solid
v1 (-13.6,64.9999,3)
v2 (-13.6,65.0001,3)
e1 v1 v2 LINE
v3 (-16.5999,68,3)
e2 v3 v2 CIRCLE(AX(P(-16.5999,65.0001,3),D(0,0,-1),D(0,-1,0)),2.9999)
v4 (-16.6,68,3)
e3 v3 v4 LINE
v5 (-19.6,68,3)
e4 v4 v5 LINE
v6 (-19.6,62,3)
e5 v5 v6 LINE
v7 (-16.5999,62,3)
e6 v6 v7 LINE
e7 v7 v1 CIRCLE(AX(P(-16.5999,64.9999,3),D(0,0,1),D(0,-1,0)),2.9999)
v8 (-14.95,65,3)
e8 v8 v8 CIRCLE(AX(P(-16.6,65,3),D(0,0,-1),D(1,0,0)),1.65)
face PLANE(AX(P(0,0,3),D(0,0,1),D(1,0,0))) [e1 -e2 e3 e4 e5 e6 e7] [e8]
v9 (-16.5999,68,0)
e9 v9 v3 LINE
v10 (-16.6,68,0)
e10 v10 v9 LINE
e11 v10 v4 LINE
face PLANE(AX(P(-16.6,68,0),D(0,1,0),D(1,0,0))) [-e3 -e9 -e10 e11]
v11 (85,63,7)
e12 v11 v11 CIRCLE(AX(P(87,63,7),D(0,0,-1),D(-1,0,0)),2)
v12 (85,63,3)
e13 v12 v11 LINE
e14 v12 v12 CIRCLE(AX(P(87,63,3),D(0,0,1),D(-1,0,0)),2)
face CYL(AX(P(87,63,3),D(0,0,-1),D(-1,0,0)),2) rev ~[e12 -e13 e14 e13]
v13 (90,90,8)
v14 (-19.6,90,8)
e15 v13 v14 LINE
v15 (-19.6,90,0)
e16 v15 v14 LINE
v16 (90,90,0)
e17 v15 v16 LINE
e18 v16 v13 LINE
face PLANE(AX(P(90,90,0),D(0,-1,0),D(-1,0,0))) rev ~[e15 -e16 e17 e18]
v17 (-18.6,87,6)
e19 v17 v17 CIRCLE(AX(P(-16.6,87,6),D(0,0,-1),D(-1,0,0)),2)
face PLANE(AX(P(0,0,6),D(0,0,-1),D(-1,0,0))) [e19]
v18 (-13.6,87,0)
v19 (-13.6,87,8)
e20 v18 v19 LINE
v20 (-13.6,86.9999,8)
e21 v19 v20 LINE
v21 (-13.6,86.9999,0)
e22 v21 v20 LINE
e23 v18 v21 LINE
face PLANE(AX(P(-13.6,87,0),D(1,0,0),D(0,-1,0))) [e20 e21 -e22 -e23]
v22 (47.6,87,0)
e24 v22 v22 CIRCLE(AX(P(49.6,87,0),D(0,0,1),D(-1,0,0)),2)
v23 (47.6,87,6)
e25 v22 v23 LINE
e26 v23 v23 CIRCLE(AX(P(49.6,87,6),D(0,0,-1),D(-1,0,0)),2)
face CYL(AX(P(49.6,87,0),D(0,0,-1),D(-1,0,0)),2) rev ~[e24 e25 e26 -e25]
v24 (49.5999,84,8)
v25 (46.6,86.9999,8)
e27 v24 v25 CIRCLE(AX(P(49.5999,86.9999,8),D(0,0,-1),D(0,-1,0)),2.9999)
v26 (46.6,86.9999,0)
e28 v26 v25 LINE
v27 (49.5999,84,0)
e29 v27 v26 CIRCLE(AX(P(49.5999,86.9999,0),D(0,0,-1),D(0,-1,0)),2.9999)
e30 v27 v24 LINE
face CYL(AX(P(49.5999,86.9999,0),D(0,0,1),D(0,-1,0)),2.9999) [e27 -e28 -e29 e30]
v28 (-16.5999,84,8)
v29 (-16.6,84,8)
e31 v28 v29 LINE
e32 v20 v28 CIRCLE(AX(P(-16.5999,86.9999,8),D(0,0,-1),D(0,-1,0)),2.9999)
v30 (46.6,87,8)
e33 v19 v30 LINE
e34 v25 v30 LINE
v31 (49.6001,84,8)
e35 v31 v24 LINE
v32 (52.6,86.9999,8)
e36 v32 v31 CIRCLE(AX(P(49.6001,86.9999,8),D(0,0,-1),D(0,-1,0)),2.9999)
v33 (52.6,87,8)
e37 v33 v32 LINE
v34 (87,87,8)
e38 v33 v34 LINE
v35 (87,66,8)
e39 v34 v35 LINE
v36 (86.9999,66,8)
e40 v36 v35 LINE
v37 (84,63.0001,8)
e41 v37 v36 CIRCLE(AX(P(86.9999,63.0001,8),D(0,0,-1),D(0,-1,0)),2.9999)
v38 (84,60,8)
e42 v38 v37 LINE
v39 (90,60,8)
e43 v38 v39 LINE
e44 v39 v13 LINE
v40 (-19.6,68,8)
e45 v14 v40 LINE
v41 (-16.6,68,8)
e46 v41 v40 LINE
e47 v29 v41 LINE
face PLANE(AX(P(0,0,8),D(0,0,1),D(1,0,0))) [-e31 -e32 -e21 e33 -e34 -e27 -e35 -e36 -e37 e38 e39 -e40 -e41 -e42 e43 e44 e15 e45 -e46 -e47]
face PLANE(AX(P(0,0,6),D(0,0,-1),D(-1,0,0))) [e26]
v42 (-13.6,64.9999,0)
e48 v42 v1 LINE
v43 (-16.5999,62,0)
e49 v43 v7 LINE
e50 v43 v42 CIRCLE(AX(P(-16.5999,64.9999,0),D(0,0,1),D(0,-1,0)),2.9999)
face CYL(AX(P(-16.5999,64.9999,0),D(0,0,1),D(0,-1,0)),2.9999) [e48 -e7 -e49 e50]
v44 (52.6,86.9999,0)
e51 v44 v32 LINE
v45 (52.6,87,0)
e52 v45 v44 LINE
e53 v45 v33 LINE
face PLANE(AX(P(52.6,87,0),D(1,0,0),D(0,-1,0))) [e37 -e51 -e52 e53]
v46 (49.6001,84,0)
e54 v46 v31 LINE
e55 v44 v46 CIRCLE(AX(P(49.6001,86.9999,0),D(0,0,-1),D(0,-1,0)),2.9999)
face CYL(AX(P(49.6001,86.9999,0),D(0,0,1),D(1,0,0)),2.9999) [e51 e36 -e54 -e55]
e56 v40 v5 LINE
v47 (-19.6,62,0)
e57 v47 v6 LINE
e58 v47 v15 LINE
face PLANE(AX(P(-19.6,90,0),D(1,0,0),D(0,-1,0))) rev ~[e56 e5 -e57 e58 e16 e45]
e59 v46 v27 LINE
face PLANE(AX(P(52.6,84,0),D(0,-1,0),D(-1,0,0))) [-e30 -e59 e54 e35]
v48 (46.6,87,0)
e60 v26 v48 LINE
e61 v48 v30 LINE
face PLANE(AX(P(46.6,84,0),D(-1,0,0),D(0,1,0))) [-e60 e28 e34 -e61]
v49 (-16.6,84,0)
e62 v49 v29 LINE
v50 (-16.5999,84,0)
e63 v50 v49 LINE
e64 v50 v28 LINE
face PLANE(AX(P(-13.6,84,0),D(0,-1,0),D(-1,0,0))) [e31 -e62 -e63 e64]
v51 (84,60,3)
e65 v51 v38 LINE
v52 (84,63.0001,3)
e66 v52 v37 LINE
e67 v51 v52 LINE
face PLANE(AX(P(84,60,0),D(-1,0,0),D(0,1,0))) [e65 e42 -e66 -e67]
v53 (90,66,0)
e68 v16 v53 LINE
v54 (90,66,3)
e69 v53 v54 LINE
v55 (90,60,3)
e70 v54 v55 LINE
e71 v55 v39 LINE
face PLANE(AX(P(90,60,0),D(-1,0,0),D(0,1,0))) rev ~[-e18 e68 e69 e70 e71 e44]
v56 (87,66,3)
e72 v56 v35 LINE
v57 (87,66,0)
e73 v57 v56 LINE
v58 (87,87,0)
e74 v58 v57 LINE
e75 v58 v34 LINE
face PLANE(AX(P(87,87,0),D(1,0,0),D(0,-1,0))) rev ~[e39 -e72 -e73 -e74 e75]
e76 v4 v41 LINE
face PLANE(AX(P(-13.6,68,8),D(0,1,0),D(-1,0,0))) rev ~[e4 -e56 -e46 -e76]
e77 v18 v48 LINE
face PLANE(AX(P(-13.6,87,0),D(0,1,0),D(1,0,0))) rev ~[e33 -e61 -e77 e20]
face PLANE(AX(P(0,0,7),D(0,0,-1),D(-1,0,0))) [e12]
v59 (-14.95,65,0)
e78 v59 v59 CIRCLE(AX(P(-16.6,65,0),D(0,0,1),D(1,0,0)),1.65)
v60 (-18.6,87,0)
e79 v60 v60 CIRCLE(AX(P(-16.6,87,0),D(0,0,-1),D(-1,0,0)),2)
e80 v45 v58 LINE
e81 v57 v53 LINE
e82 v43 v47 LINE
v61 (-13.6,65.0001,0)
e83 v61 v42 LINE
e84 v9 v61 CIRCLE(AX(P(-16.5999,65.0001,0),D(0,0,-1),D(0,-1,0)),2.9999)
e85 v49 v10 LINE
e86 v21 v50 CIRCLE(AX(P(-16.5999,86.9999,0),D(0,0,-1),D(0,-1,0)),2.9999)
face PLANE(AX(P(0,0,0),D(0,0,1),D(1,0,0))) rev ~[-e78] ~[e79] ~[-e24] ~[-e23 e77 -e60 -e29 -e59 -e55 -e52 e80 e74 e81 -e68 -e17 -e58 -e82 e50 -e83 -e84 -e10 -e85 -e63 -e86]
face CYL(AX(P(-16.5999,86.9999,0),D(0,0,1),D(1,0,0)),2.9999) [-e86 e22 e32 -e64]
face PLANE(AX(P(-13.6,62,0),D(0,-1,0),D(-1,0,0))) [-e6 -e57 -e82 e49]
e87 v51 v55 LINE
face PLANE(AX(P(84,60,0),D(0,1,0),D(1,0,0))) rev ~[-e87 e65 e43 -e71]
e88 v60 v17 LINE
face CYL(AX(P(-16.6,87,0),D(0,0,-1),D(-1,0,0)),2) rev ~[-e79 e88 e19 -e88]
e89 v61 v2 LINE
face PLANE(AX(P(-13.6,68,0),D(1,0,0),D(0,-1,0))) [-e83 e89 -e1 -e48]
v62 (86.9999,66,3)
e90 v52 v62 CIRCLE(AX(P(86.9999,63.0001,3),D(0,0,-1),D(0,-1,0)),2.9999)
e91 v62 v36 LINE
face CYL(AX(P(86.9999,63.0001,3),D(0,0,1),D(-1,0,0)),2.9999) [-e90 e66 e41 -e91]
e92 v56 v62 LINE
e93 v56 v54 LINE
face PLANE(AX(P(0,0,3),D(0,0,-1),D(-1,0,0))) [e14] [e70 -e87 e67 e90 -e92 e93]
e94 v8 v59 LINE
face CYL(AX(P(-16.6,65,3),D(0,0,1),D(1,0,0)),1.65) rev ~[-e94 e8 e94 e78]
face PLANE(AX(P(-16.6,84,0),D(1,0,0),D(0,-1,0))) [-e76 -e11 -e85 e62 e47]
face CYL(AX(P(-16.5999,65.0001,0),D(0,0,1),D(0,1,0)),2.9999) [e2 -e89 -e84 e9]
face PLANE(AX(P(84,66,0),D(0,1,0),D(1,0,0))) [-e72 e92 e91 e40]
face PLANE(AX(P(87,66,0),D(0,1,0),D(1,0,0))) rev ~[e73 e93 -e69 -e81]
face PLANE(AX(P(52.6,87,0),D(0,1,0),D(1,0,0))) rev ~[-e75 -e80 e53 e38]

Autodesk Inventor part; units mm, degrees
ref_plane "YZ Plane" through (0, 0, 0) normal (1, 0, 0) x (0, 1, 0)
ref_plane "XZ Plane" through (0, 0, 0) normal (0, 1, 0) x (-1, 0, 0)
ref_plane "XY Plane" through (0, 0, 0) normal (0, 0, 1) x (1, 0, 0)
sketch "Sketch1" plane through (0, 0, 0) normal (0, 0, 1) x (1, 0, 0)
  point P0 (0, 0)
sketch "Sketch2" plane through (0, 0, 0) normal (0, 0, 1) x (1, 0, 0)
  line L0 (-58, -60) -> (-60, -60) projected
  line L1 (-60, -60) -> (-60, -39.5) projected
  line L2 (-60, -39.5) -> (-58, -39.5) projected
  line L3 (-58, -39.5) -> (-58, -60) projected
  line L4 (49.6, 30) -> (51.6, 30) projected
  line L5 (51.6, 30) -> (51.6, 9.5) projected
  line L6 (51.6, 9.5) -> (49.6, 9.5) projected
  line L7 (49.6, 9.5) -> (49.6, 30) projected
  line L8 (-58, 39.5) -> (-60, 39.5) projected
  line L9 (-60, 39.5) -> (-60, 60) projected
  line L10 (-60, 60) -> (-58, 60) projected
  line L11 (-58, 60) -> (-58, 39.5) projected
  line L12 (-21.6, -39.5) -> (-19.6, -39.5) projected
  line L13 (-19.6, -39.5) -> (-19.6, -60) projected
  line L14 (-19.6, -60) -> (-21.6, -60) projected
  line L15 (-21.6, -60) -> (-21.6, -39.5) projected
  line L16 (51.6, -30) -> (49.6, -30) projected
  line L17 (49.6, -30) -> (49.6, -9.5) projected
  line L18 (49.6, -9.5) -> (51.6, -9.5) projected
  line L19 (51.6, -9.5) -> (51.6, -30) projected
  line L20 (-21.6, 60) -> (-19.6, 60) projected
  line L21 (-19.6, 60) -> (-19.6, 39.5) projected
  line L22 (-19.6, 39.5) -> (-21.6, 39.5) projected
  line L23 (-21.6, 39.5) -> (-21.6, 60) projected
  line L24 (90, -35) -> (90, 35) projected
  line L25 (90, 35) -> (49.6, 35) projected
  line L26 (49.6, 35) -> (49.6, 60) projected
  line L27 (49.6, 60) -> (90, 60) projected
  line L28 (90, 60) -> (90, 90) projected
  line L29 (90, 90) -> (-19.6, 90) projected
  line L30 (-19.6, 90) -> (-19.6, 65) projected
  line L31 (-19.6, 65) -> (-60, 65) projected
  line L32 (-60, 65) -> (-60, 90) projected
  line L33 (-60, 90) -> (-90, 90) projected
  line L34 (-90, 90) -> (-90, -90) projected
  line L35 (-90, -90) -> (-60, -90) projected
  line L36 (-60, -90) -> (-60, -65) projected
  line L37 (-60, -65) -> (-19.6, -65) projected
  line L38 (-19.6, -65) -> (-19.6, -90) projected
  line L39 (-19.6, -90) -> (90, -90) projected
  line L40 (90, -90) -> (90, -60) projected
  line L41 (90, -60) -> (49.6, -60) projected
  line L42 (49.6, -60) -> (49.6, -35) projected
  line L43 (49.6, -35) -> (90, -35) projected
  line L44 (86, -32) -> (73.8, -32) projected
  line L45 (73.8, -32) -> (73.8, -7.5) projected
  line L46 (73.8, -7.5) -> (86, -7.5) projected
  line L47 (86, -7.5) -> (86, -32) projected
  line L48 (65.8, -32) -> (53.6, -32) projected
  line L49 (53.6, -32) -> (53.6, -7.5) projected
  line L50 (53.6, -7.5) -> (65.8, -7.5) projected
  line L51 (65.8, -7.5) -> (65.8, -32) projected
  line L52 (86, -86) -> (70.6, -86) projected
  line L53 (70.6, -86) -> (70.6, -69.8) projected
  line L54 (70.6, -69.8) -> (86, -69.8) projected
  line L55 (86, -69.8) -> (86, -86) projected
  line L56 (86, 86) -> (86, 69.8) projected
  line L57 (86, 69.8) -> (70.6, 69.8) projected
  line L58 (70.6, 69.8) -> (70.6, 86) projected
  line L59 (70.6, 86) -> (86, 86) projected
  line L60 (73.8, 32) -> (86, 32) projected
  line L61 (86, 32) -> (86, 7.5) projected
  line L62 (86, 7.5) -> (73.8, 7.5) projected
  line L63 (73.8, 7.5) -> (73.8, 32) projected
  line L64 (65.8, 32) -> (65.8, 7.5) projected
  line L65 (65.8, 7.5) -> (53.6, 7.5) projected
  line L66 (53.6, 7.5) -> (53.6, 32) projected
  line L67 (53.6, 32) -> (65.8, 32) projected
  line L68 (-69.6, -87) -> (-85, -87) projected
  line L69 (-85, -87) -> (-85, -70.8) projected
  line L70 (-85, -70.8) -> (-69.6, -70.8) projected
  line L71 (-69.6, -70.8) -> (-69.6, -87) projected
  line L72 (-56, -62) -> (-56, -37.5) projected
  line L73 (-56, -37.5) -> (-43.8, -37.5) projected
  line L74 (-43.8, -37.5) -> (-43.8, -62) projected
  line L75 (-43.8, -62) -> (-56, -62) projected
  line L76 (-56, 62) -> (-43.8, 62) projected
  line L77 (-43.8, 62) -> (-43.8, 37.5) projected
  line L78 (-43.8, 37.5) -> (-56, 37.5) projected
  line L79 (-56, 37.5) -> (-56, 62) projected
  line L80 (-23.6, 62) -> (-23.6, 37.5) projected
  line L81 (-23.6, 37.5) -> (-35.8, 37.5) projected
  line L82 (-35.8, 37.5) -> (-35.8, 62) projected
  line L83 (-35.8, 62) -> (-23.6, 62) projected
  line L84 (-23.6, -62) -> (-35.8, -62) projected
  line L85 (-35.8, -62) -> (-35.8, -37.5) projected
  line L86 (-35.8, -37.5) -> (-23.6, -37.5) projected
  line L87 (-23.6, -37.5) -> (-23.6, -62) projected
  line L88 (-85, 87) -> (-69.6, 87) projected
  line L89 (-69.6, 87) -> (-69.6, 70.8) projected
  line L90 (-69.6, 70.8) -> (-85, 70.8) projected
  line L91 (-85, 70.8) -> (-85, 87) projected
  line L92 (46.6, 35) -> (49.6, 35) projected
  line L93 (49.6, 35) -> (49.6, 60) projected
  line L94 (49.6, 60) -> (84, 60) projected
  line L95 (84, 63) -> (43.6, 63) projected
  line L96 (46.6, 57) -> (46.6, 35) projected
  line L97 (90, 90) -> (87, 90)
  line L98 (87, 90) -> (87, 63)
  line L99 (87, 63) -> (90, 63)
  line L100 (90, 63) -> (90, 90)
  line L101 (87, 90) -> (-19.6, 90)
  line L102 (-19.6, 90) -> (-19.6, 87)
  line L103 (-19.6, 87) -> (87, 87)
  line L104 (87, 87) -> (87, 90)
  line L105 (-19.6, 90) -> (-16.6, 90)
  line L106 (-16.6, 90) -> (-16.6, 65)
  line L107 (-16.6, 65) -> (-19.6, 65)
  line L108 (-19.6, 65) -> (-19.6, 90)
  line L109 (-19.6, 90) -> (-13.6, 90)
  line L110 (-13.6, 90) -> (-13.6, 84)
  line L111 (-13.6, 84) -> (-19.6, 84)
  line L112 (-19.6, 84) -> (-19.6, 90)
  line L113 (90, 60) -> (84, 60)
  line L114 (84, 60) -> (84, 66)
  line L115 (84, 66) -> (90, 66)
  line L116 (90, 66) -> (90, 60)
  line L117 (-19.6, 65) -> (-16.6, 65)
  line L118 (-16.6, 65) -> (-16.6, 68)
  line L119 (-16.6, 68) -> (-19.6, 68)
  line L120 (-19.6, 68) -> (-19.6, 65)
  line L121 (-19.6, 68) -> (-13.6, 68)
  line L122 (-13.6, 68) -> (-13.6, 62)
  line L123 (-13.6, 62) -> (-19.6, 62)
  line L124 (-19.6, 62) -> (-19.6, 68)
  line L125 (46.6, 90) -> (52.6, 90)
  line L126 (52.6, 90) -> (52.6, 84)
  line L127 (52.6, 84) -> (46.6, 84)
  line L128 (46.6, 84) -> (46.6, 90)
  line L129 (84, 60) -> (84, 63) projected
  circle A0 centre (-63, -65) radius 1.5 projected
  circle A1 centre (-16.6, -87) radius 1.5 projected
  circle A2 centre (49.6, -87) radius 1.5 projected
  circle A3 centre (46.6, -60) radius 1.5 projected
  circle A4 centre (87, -63) radius 1.5 projected
  circle A5 centre (46.6, -32) radius 1.5 projected
  circle A6 centre (46.6, 32) radius 1.5 projected
  circle A7 centre (87, 63) radius 1.5 projected
  circle A8 centre (46.6, 60) radius 1.5 projected
  circle A9 centre (49.6, 87) radius 1.5 projected
  circle A10 centre (-16.6, 87) radius 1.5 projected
  circle A11 centre (-16.6, 65) radius 1.5 projected
  circle A12 centre (-63, 65) radius 1.5 projected
  line L130 (43.6, 63) -> (43.6, 57) projected
  line L131 (43.6, 57) -> (46.6, 57) projected
  point P0 (0, 0)
  point P1 (90, 63)
  point P2 (87, 66)
  point P3 (-16.6, 84)
  point P4 (-13.6, 87)
  point P5 (46.6, 87)
  point P6 (52.6, 87)
  dimension "d0" = 3
  dimension "d1" = 3
  dimension "d2" = 6
  dimension "d3" = 6
  dimension "d4" = 6
  dimension "d5" = 6
  dimension "d6" = 3
  dimension "d7" = 6
  dimension "d8" = 6
extrude "Extrusion1" add sketch "Sketch2" along normal blind 8 contours L114 L115 L98 A7 L99 L28 L27 | L99 A7 L98 L115 L28 | L115 L98 L29 L28 | A7 L98 L99 | L99 L98 A7 | L103 L126 L29 L98 | L126 L127 L128 L103 A9 | L103 A9 L128 L29 L126 | A9 L103 | L103 A9 | L128 L103 L110 L29 | L110 L103 A10 L106 L29 | L106 A10 L103 L30 L29 | L110 L111 L106 A10 L103 | L30 L119 L106 A11 L107 | L107 A11 L106 L121 L122 L123 L124 | A10 L103 L106 | L106 L103 A10 | A10 L106 L103 | L30 L111 L106 L119 | A11 L106 L107 | L107 L106 A11 | L103 A10 L106 L111 L30 | L106 A10 L103
sketch "Sketch3" plane through (0, 0, 0) normal (0, 0, -1) x (-1, 0, 0)
  line L0 (-87, 66) -> (-84, 66) projected
  line L1 (-84, 60) -> (-90, 60) projected
  line L2 (-84, 66) -> (-90, 66)
  line L3 (-90, 66) -> (-90, 60)
  line L4 (-90, 60) -> (-84, 60)
  line L5 (-84, 60) -> (-84, 66)
  point P0 (0, 0)
extrude "Extrusion2" cut sketch "Sketch3" against normal blind 3
sketch "Sketch4" plane through (0, 0, 3) normal (0, 0, -1) x (-1, 0, 0)
  line L0 (-87, 66) -> (-84, 66) projected
  line L1 (-90, 60) -> (-90, 90) projected
  line L2 (-84, 66) -> (-90, 60)
  line L3 (-90, 60) -> (-90, 66)
  line L4 (-84, 66) -> (-84, 60) projected
  line L5 (-90, 66) -> (-84, 60)
  circle A0 centre (-87, 63) radius 2
  point P0 (0, 0)
  dimension "d13" = 4
extrude "Extrusion3" cut sketch "Sketch4" against normal blind 4 contours A0 L5 L2 | L2 L5 A0 | A0 L2 L5 | L2 A0 L5
sketch "Sketch5" plane through (0, 0, 8) normal (0, 0, 1) x (1, 0, 0)
  line L0 (-13.6, 62) -> (-13.6, 68) projected
  line L1 (-19.6, 62) -> (-13.6, 62) projected
  line L2 (-13.6, 68) -> (-19.6, 68)
  line L3 (-19.6, 68) -> (-19.6, 62)
  line L4 (-19.6, 62) -> (-13.6, 62)
  line L5 (-13.6, 62) -> (-13.6, 68)
  point P0 (0, 0)
extrude "Extrusion4" cut sketch "Sketch5" against normal blind 5
sketch "Sketch6" plane through (0, 0, 3) normal (0, 0, 1) x (1, 0, 0)
  line L0 (-13.6, 68) -> (-13.6, 62) projected
  line L1 (-19.6, 62) -> (-19.6, 68) projected
  line L2 (-13.6, 68) -> (-19.6, 62)
  line L3 (-19.6, 62) -> (-19.6, 68)
  line L4 (-19.6, 68) -> (-13.6, 62)
  circle A0 centre (-16.6, 65) radius 1.65
  point P0 (0, 0)
  dimension "d18" = 3.3
extrude "Extrusion5" cut sketch "Sketch6" against normal blind 3 contours A0 L4 L2 | L2 L4 A0 | A0 L2 L4 | L2 A0 L4
sketch "Sketch7" plane through (0, 0, 0) normal (0, 0, -1) x (-1, 0, 0)
  point P0 (0, 0)
sketch "Sketch8" plane through (0, 0, 0) normal (0, 0, -1) x (-1, 0, 0)
  line L0 (-46.6, 84) -> (-52.6, 84) projected
  line L1 (-90, 90) -> (19.6, 90) projected
  line L2 (-52.6, 84) -> (-46.6, 84)
  line L3 (-46.6, 84) -> (-46.6, 90)
  line L4 (-46.6, 90) -> (-52.6, 90)
  line L5 (-52.6, 90) -> (-52.6, 84)
  line L6 (-52.6, 84) -> (-46.6, 90)
  line L7 (-46.6, 84) -> (-52.6, 90)
  circle A0 centre (-49.6, 87) radius 2
  line L8 (19.6, 90) -> (13.6, 90)
  line L9 (13.6, 90) -> (13.6, 84)
  line L10 (13.6, 84) -> (19.6, 84)
  line L11 (19.6, 84) -> (19.6, 90)
  line L12 (19.6, 90) -> (13.6, 84) construction
  line L13 (13.6, 90) -> (19.6, 84) construction
  line L14 (13.6, 84) -> (13.6, 87) projected
  circle A1 centre (16.6, 87) radius 2
  point P0 (0, 0)
  dimension "d21" = 6
  dimension "d22" = 4
  dimension "d23" = 6
  dimension "d24" = 6
  dimension "d25" = 4
extrude "Extrusion6" cut sketch "Sketch8" against normal blind 6 contours A0 L6 L7 | L7 L6 A0 | A0 L7 L6 | L6 L7 A0 | A1
fillet "Fillet1" radius 3 4 edges at (-13.6, 62, 1.5) (-13.6, 68, 1.5) (46.6, 84, 4) (52.6, 84, 4)
fillet "Fillet2" radius 3 1 edges at (-13.6, 84, 4)
fillet "Fillet3" radius 3 1 edges at (84, 66, 5.5)
properties part number "leftwall2"
